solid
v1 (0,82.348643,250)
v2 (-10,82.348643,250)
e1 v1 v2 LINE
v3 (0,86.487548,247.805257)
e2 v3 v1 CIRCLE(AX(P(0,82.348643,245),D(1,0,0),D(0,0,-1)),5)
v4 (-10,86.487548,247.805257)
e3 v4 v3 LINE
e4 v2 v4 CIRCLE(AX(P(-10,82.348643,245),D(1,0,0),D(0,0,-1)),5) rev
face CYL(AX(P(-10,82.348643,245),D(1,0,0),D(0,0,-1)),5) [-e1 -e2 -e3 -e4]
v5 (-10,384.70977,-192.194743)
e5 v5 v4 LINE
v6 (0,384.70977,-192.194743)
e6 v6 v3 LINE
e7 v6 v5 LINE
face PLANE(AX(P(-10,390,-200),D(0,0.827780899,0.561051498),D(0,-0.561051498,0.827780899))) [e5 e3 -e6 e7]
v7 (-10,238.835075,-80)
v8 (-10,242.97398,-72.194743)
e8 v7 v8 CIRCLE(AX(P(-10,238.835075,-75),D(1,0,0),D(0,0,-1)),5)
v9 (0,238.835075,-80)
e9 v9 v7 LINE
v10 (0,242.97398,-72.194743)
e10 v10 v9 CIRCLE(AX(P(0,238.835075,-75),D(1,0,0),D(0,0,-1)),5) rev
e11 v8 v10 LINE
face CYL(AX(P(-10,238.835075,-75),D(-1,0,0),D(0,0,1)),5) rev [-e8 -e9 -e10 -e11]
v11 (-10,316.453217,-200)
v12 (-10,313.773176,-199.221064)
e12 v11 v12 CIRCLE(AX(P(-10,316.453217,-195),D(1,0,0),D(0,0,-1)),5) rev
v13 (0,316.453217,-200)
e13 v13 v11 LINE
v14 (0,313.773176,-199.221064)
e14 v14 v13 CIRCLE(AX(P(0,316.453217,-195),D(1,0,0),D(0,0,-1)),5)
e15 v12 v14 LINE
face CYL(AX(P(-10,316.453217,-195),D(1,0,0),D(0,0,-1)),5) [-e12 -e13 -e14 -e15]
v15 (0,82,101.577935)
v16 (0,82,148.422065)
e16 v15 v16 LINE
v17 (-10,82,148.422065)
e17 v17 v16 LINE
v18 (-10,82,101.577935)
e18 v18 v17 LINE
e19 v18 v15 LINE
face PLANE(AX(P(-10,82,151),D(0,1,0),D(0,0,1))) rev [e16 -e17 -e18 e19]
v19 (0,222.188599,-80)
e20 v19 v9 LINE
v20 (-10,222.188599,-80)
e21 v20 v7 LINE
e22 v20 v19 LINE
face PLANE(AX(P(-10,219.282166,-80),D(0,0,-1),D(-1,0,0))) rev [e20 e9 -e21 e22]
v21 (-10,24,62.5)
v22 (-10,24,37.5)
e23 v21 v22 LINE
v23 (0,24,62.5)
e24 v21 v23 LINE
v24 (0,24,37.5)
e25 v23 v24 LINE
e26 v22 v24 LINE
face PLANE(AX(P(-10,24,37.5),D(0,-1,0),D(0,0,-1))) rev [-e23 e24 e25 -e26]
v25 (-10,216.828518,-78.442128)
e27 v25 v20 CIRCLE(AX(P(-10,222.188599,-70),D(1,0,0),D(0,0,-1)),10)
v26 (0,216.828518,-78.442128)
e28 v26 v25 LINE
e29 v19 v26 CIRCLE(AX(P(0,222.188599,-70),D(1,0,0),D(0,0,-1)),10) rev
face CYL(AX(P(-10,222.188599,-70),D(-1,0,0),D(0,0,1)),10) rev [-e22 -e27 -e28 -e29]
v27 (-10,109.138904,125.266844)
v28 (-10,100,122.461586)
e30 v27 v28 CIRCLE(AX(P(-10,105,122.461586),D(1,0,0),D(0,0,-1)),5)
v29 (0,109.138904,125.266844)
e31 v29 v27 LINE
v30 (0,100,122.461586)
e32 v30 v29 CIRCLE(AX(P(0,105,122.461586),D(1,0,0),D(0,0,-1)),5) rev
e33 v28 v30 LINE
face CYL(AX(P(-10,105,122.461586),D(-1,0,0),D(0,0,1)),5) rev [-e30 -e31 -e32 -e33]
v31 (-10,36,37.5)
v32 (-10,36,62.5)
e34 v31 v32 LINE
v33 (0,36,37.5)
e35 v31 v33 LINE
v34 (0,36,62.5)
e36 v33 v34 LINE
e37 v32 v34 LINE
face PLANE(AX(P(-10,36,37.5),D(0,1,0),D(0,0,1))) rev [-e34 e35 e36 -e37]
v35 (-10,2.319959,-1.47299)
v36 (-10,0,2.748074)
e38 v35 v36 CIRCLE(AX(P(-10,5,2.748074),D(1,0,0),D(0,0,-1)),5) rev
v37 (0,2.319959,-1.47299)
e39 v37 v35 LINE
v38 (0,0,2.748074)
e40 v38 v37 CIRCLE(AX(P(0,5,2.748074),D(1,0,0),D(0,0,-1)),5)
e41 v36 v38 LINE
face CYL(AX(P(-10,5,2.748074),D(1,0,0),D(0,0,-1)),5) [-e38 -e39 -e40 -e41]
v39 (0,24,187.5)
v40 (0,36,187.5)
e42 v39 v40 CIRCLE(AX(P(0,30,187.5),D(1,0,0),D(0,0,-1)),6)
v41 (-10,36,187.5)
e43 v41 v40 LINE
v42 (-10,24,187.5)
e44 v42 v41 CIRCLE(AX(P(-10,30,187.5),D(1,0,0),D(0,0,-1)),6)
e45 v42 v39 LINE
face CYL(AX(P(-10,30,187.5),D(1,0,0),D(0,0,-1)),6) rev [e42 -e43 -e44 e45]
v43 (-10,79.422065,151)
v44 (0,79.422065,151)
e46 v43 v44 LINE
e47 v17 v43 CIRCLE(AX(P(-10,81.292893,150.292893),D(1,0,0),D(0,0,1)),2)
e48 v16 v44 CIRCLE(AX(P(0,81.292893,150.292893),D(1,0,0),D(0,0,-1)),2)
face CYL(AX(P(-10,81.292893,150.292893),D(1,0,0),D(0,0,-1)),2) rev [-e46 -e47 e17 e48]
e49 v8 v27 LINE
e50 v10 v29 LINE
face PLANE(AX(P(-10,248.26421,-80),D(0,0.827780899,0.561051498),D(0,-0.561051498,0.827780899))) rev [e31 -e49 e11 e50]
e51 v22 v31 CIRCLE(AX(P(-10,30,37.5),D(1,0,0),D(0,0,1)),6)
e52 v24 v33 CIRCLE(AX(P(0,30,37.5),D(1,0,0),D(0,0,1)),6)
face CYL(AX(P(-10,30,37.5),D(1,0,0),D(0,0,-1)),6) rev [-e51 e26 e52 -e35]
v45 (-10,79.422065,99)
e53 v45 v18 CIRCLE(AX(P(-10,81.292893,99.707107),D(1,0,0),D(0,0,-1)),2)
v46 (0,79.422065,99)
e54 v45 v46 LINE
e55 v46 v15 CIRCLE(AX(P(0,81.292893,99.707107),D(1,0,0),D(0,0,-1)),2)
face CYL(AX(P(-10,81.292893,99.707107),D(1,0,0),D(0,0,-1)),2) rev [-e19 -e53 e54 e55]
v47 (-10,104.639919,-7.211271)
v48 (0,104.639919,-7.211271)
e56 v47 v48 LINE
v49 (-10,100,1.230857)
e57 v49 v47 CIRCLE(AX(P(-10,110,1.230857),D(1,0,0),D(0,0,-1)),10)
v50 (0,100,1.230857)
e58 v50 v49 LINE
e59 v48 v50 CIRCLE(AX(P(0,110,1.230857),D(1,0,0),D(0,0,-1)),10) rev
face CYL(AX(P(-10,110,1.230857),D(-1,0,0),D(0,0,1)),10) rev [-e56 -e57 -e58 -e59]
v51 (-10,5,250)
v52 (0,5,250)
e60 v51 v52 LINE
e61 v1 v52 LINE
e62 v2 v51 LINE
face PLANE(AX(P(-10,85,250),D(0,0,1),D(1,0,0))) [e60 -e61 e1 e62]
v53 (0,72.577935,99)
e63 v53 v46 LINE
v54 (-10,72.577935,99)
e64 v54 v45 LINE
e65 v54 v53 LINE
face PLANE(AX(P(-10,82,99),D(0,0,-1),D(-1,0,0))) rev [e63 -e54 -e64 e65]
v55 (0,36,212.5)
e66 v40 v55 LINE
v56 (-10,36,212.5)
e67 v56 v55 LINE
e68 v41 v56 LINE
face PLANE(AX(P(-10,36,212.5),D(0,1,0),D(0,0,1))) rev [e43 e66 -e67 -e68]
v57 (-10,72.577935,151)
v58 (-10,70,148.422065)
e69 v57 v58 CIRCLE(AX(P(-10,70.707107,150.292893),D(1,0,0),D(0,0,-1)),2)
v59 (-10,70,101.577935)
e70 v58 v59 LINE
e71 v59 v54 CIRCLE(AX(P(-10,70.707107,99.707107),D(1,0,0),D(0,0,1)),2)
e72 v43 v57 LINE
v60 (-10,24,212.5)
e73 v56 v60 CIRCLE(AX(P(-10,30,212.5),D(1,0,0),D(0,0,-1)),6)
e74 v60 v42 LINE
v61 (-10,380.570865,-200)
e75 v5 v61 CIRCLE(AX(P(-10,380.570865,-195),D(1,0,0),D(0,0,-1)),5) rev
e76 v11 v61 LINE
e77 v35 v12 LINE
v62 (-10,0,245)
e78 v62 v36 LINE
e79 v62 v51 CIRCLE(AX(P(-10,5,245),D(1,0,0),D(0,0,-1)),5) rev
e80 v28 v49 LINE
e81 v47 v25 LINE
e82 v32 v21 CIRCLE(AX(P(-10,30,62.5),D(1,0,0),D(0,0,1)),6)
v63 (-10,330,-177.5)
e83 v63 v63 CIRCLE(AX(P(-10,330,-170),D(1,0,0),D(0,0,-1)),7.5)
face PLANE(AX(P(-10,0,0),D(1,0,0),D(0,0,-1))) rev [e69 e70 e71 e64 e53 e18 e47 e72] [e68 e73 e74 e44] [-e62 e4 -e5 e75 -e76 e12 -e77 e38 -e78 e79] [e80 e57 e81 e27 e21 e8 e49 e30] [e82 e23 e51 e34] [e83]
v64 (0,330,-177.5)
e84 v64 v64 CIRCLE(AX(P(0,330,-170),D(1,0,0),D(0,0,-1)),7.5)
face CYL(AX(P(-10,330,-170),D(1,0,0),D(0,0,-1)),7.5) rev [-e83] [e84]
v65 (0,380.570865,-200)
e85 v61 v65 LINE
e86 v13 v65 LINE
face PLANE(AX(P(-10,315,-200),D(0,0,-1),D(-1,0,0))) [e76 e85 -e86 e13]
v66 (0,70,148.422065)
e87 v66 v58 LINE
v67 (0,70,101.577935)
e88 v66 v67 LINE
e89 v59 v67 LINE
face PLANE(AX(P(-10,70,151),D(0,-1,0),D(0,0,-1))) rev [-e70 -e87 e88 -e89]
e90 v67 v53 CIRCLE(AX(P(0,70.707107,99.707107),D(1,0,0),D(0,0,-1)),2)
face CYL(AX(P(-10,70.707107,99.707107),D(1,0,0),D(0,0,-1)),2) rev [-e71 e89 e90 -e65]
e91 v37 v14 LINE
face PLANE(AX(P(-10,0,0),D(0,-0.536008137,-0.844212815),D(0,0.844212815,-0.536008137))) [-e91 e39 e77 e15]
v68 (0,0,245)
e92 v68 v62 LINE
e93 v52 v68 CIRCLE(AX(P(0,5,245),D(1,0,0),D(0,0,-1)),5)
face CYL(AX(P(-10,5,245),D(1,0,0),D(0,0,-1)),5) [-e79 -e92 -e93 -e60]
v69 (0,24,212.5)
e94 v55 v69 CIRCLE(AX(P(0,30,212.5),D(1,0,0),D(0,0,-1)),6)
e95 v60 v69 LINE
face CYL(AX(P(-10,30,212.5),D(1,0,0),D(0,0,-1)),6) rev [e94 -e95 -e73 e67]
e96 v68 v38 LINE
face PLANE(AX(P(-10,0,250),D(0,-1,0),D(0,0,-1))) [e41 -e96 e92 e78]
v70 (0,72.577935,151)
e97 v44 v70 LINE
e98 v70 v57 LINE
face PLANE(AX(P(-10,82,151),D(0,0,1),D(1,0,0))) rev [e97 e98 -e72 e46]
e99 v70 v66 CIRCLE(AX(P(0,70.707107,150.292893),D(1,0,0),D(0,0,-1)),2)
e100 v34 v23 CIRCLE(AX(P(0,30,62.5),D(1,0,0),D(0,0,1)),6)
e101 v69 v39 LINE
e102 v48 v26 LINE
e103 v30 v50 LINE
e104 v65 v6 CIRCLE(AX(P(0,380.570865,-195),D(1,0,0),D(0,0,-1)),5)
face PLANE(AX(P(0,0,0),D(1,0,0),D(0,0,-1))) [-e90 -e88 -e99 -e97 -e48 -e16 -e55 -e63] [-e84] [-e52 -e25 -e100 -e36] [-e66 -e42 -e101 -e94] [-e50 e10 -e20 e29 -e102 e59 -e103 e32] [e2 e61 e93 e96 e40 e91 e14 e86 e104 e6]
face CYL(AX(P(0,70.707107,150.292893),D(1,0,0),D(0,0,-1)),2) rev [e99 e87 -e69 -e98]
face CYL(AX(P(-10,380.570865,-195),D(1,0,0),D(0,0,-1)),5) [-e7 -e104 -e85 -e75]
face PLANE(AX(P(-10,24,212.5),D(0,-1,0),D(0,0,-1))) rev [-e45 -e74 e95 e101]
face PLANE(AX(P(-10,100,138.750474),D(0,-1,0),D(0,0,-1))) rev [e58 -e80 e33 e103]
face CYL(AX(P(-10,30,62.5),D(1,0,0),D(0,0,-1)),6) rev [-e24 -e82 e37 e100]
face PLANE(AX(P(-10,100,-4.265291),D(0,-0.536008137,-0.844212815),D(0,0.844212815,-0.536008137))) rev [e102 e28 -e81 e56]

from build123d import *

# Parameters (mm, degrees)
BASE_FLANGE1_DEPTH = 10
CUT_EXTRUDE1_DEPTH = 464.357313528
CUT_EXTRUDE2_DEPTH = 464.357313528
FILLET1_R          = 10
FILLET2_R          = 5
SKETCH8_R          = 7.5
CUT_EXTRUDE3_DEPTH = 460.635608137
SKETCH9_W          = 52
SKETCH9_H          = 12
CUT_EXTRUDE4_DEPTH = 460.635608137
SKETCH10_R         = 2
CUT_EXTRUDE5_DEPTH = 460.635608137


# Sheet-metal steps are written as plain solids
with BuildPart() as part:
    # Sketch1 → Base-Flange1 (new body)
    with BuildSketch(Plane(origin=(0, 0, 0), x_dir=(0, 0, -1), z_dir=(1, 0, 0))):
        Polygon((0, 0), (200, 315), (200, 390), (-250, 85), (-250, 0), align=None)
    extrude(amount=-BASE_FLANGE1_DEPTH)

    # Sketch6 → Cut-Extrude1 (cut, through all)
    with BuildSketch(Plane(origin=(0, 0, 0), x_dir=(0, 0, -1), z_dir=(1, 0, 0))):
        with BuildLine():
            Line((-212.5, 36), (-187.5, 36))
            ThreePointArc((-187.5, 36), (-181.5, 30), (-187.5, 24))
            Line((-187.5, 24), (-212.5, 24))
            ThreePointArc((-212.5, 24), (-218.5, 30), (-212.5, 36))
        make_face()
        with BuildLine():
            Line((-37.5, 36), (-62.5, 36))
            ThreePointArc((-62.5, 36), (-68.5, 30), (-62.5, 24))
            Line((-62.5, 24), (-37.5, 24))
            ThreePointArc((-37.5, 24), (-31.5, 30), (-37.5, 36))
        make_face()
    extrude(amount=-CUT_EXTRUDE1_DEPTH, mode=Mode.SUBTRACT)

    # Sketch7 → Cut-Extrude2 (cut, through all)
    with BuildSketch(Plane(origin=(0, 0, 0), x_dir=(0, 0, -1), z_dir=(1, 0, 0))):
        Polygon((80, 248.264209845), (-138.750473541, 100), (4.265291407, 100), (80, 219.282166034), align=None)
    extrude(amount=-CUT_EXTRUDE2_DEPTH, mode=Mode.SUBTRACT)

    # Fillet1
    fillet1_edges = [part.edges().sort_by_distance(p)[0] for p in [
        (-5, 219.282166034, -80),
        (-5, 100, -4.265291407),
    ]]
    fillet(fillet1_edges, radius=FILLET1_R)

    # Fillet2
    fillet2_edges = [part.edges().sort_by_distance(p)[0] for p in [
        (-5, 248.264209845, -80),
        (-5, 100, 138.750473541),
        (-5, 0, 250),
        (-5, 85, 250),
        (-5, 390, -200),
        (-5, 315, -200),
        (-5, 0, 0),
    ]]
    fillet(fillet2_edges, radius=FILLET2_R)

    # Sketch8 → Cut-Extrude3 (cut, through all)
    with BuildSketch(Plane(origin=(0, 0, 0), x_dir=(0, 0, -1), z_dir=(1, 0, 0))):
        with Locations((170, 330)):
            Circle(SKETCH8_R)
    extrude(amount=-CUT_EXTRUDE3_DEPTH, mode=Mode.SUBTRACT)

    # Sketch9 → Cut-Extrude4 (cut, through all)
    with BuildSketch(Plane(origin=(0, 0, 0), x_dir=(0, 0, -1), z_dir=(1, 0, 0))):
        with Locations((-125, 76)):
            Rectangle(SKETCH9_W, SKETCH9_H)
    extrude(amount=-CUT_EXTRUDE4_DEPTH, mode=Mode.SUBTRACT)

    # Sketch10 → Cut-Extrude5 (cut, through all)
    with BuildSketch(Plane(origin=(0, 0, 0), x_dir=(0, 0, -1), z_dir=(1, 0, 0))):
        with Locations((-150.292893219, 70.707106781)):
            Circle(SKETCH10_R)
        with Locations((-150.292893219, 81.292893219)):
            Circle(SKETCH10_R)
        with Locations((-99.707106781, 81.292893219)):
            Circle(SKETCH10_R)
        with Locations((-99.707106781, 70.707106781)):
            Circle(SKETCH10_R)
    extrude(amount=-CUT_EXTRUDE5_DEPTH, mode=Mode.SUBTRACT)


solid = part.part
